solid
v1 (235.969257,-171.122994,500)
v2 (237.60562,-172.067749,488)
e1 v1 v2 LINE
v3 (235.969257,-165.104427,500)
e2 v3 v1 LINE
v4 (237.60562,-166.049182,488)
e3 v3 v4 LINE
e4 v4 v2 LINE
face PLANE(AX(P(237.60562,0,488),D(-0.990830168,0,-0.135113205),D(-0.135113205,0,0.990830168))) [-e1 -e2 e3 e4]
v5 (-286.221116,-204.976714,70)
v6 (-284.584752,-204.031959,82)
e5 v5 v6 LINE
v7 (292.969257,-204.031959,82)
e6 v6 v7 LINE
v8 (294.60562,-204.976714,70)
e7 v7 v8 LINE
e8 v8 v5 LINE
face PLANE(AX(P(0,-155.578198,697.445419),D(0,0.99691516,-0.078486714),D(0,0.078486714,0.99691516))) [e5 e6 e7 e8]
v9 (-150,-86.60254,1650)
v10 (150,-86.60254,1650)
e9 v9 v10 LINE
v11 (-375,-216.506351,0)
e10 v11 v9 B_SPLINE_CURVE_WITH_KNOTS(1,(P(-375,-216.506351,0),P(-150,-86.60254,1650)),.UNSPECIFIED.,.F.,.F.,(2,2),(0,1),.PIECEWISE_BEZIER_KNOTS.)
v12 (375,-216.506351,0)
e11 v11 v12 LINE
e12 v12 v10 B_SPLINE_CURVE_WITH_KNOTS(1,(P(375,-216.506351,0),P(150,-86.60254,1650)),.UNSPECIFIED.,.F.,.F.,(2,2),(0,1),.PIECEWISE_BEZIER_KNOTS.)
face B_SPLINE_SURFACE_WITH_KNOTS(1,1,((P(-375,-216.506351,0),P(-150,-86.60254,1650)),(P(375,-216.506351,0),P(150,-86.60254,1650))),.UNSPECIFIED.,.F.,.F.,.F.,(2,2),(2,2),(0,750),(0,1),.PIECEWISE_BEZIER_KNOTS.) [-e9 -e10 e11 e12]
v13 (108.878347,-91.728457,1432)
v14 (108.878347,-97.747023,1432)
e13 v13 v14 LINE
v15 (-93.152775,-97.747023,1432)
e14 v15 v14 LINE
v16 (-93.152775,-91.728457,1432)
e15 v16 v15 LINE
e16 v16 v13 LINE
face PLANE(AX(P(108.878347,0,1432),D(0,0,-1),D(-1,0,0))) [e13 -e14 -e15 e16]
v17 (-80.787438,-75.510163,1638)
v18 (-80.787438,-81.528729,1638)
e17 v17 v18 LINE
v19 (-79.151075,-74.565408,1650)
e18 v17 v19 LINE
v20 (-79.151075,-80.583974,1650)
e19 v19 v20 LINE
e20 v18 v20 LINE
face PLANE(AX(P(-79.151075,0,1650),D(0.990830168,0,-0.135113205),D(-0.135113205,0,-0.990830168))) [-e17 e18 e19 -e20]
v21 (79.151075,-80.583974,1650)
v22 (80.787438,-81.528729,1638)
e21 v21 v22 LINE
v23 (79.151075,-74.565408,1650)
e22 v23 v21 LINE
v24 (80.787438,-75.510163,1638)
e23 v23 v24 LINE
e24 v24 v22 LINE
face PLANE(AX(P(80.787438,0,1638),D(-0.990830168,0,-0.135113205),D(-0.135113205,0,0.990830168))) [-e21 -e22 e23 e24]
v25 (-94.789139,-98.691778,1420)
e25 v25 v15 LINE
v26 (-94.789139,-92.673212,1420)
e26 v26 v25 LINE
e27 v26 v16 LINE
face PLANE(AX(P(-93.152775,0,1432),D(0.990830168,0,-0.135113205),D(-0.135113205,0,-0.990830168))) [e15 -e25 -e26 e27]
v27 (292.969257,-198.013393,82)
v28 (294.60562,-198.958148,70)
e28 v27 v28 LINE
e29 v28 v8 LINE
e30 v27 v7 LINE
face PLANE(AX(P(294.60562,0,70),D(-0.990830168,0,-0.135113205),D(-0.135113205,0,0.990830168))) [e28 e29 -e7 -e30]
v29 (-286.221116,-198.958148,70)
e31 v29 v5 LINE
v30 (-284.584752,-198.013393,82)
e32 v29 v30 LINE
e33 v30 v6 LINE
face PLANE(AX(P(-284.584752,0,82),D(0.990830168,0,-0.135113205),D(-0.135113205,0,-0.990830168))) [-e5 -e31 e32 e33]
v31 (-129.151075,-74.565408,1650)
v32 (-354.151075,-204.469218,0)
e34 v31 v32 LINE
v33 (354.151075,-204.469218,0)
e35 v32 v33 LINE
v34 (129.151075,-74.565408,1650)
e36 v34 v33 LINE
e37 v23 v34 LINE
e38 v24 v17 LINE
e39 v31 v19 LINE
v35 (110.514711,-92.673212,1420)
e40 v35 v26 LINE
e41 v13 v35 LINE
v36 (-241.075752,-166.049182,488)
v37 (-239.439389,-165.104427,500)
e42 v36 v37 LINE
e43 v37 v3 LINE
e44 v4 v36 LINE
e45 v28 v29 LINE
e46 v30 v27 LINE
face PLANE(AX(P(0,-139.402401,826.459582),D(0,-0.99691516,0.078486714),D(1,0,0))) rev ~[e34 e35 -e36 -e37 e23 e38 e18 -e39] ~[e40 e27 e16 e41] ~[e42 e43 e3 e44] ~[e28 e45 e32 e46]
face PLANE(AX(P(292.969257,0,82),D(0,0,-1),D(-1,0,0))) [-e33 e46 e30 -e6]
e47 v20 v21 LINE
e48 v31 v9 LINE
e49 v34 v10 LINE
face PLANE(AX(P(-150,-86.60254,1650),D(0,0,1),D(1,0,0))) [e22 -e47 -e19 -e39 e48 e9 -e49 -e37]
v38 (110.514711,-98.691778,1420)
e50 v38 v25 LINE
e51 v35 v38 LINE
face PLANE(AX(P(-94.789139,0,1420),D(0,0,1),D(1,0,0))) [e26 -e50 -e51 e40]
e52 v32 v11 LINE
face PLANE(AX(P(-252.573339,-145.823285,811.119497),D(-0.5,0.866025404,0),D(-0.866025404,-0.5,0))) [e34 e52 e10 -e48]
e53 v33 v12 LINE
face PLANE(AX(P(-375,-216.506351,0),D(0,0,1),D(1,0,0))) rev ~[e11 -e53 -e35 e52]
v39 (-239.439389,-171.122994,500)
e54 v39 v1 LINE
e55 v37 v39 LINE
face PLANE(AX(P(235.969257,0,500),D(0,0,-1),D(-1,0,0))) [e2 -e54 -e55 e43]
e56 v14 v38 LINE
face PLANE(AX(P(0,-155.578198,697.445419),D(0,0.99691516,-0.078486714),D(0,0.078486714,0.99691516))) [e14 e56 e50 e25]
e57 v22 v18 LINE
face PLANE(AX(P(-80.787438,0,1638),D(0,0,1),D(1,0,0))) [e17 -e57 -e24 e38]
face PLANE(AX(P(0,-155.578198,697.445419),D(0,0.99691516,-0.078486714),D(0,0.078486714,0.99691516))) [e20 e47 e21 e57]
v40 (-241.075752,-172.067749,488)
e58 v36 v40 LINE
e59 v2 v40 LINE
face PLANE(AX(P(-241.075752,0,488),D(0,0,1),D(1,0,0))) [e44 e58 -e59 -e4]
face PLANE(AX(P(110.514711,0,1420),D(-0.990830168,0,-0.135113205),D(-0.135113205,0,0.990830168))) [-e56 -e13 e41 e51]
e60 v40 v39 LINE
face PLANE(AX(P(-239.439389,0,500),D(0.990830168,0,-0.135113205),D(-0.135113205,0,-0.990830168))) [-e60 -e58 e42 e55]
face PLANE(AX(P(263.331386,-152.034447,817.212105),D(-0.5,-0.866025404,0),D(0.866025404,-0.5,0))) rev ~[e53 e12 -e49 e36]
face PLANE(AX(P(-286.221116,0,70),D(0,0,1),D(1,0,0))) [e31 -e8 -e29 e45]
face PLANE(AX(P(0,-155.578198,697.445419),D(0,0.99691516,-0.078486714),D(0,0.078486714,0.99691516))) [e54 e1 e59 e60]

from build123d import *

# Parameters (mm, degrees)
F7_R      = 960.2431856589
F8_DEPTH  = 635.5163904251
F12_R     = 870.2287794889
F13_DEPTH = 25
F14_R     = 892.9375722879
F15_DEPTH = 25
F19_REACH = 785.9273977736


with BuildPart() as f5:
    # F3 (on Top) → F5 section 0
    with BuildSketch(Plane.XY):
        Polygon((-375, -216.5063509461), (375, -216.5063509461), (0, 433.0127018922), align=None)
    # F4 (on line) → F5 section 1
    with BuildSketch(Plane.XY.offset(1650)):
        Polygon((-150, -86.6025403784), (150, -86.6025403784), (0, 173.2050807569), align=None)
    loft()

    # F7 (on face) → F8 (cut, through all)
    with BuildSketch(Plane(origin=(0, -203.2096543416, 15.9986111776), x_dir=(1, 0, 0), z_dir=(0, -0.9969151597, 0.078486714))):
        with Locations((0, 812.9688501358)):
            Circle(F7_R)
    extrude(amount=-F8_DEPTH, mode=Mode.SUBTRACT)

    # F12 (on face) → F13 (cut)
    with BuildSketch(Plane(origin=(0, 0, 0), x_dir=(0.8660254038, -0.5, 0), z_dir=(-0.5, -0.8660254038, 0))):
        with Locations((304.0688931942, 817.2121047974)):
            Circle(F12_R)
    extrude(amount=-F13_DEPTH, mode=Mode.SUBTRACT)

    # F14 (on face) → F15 (cut)
    with BuildSketch(Plane(origin=(0, 0, 0), x_dir=(-0.8660254038, -0.5, 0), z_dir=(-0.5, 0.8660254038, 0))):
        with Locations((291.6465699673, 811.1194968224)):
            Circle(F14_R)
    extrude(amount=F15_DEPTH, mode=Mode.SUBTRACT)

    f19_end = Plane(origin=(0, -155.5781982198, 697.4454188962), x_dir=(0, 0.078486714, 0.9969151597), z_dir=(0, 0.9969151597, -0.078486714))
    # F17 (on Front) → F19 (cut, up to a plane its end follows)
    with BuildSketch(Plane.XZ):
        Polygon((80.7874383415, 1638), (79.1510747051, 1650), (-79.1510747051, 1650), (-80.7874383415, 1638), align=None)
        Polygon((-94.7891388542, 1420), (110.5147110688, 1420), (108.8783474324, 1432), (-93.1527752178, 1432), align=None)
        Polygon((237.6056201597, 488), (235.9692565233, 500), (-239.4393885352, 500), (-241.0757521715, 488), align=None)
        Polygon((-286.2211157241, 70), (294.6056201597, 70), (292.9692565233, 82), (-284.5847520878, 82), align=None)
    f19_long = extrude(amount=F19_REACH, mode=Mode.PRIVATE)
    add(split(f19_long, bisect_by=f19_end, keep=Keep.TOP, mode=Mode.PRIVATE), mode=Mode.SUBTRACT)


solid = f5.part
